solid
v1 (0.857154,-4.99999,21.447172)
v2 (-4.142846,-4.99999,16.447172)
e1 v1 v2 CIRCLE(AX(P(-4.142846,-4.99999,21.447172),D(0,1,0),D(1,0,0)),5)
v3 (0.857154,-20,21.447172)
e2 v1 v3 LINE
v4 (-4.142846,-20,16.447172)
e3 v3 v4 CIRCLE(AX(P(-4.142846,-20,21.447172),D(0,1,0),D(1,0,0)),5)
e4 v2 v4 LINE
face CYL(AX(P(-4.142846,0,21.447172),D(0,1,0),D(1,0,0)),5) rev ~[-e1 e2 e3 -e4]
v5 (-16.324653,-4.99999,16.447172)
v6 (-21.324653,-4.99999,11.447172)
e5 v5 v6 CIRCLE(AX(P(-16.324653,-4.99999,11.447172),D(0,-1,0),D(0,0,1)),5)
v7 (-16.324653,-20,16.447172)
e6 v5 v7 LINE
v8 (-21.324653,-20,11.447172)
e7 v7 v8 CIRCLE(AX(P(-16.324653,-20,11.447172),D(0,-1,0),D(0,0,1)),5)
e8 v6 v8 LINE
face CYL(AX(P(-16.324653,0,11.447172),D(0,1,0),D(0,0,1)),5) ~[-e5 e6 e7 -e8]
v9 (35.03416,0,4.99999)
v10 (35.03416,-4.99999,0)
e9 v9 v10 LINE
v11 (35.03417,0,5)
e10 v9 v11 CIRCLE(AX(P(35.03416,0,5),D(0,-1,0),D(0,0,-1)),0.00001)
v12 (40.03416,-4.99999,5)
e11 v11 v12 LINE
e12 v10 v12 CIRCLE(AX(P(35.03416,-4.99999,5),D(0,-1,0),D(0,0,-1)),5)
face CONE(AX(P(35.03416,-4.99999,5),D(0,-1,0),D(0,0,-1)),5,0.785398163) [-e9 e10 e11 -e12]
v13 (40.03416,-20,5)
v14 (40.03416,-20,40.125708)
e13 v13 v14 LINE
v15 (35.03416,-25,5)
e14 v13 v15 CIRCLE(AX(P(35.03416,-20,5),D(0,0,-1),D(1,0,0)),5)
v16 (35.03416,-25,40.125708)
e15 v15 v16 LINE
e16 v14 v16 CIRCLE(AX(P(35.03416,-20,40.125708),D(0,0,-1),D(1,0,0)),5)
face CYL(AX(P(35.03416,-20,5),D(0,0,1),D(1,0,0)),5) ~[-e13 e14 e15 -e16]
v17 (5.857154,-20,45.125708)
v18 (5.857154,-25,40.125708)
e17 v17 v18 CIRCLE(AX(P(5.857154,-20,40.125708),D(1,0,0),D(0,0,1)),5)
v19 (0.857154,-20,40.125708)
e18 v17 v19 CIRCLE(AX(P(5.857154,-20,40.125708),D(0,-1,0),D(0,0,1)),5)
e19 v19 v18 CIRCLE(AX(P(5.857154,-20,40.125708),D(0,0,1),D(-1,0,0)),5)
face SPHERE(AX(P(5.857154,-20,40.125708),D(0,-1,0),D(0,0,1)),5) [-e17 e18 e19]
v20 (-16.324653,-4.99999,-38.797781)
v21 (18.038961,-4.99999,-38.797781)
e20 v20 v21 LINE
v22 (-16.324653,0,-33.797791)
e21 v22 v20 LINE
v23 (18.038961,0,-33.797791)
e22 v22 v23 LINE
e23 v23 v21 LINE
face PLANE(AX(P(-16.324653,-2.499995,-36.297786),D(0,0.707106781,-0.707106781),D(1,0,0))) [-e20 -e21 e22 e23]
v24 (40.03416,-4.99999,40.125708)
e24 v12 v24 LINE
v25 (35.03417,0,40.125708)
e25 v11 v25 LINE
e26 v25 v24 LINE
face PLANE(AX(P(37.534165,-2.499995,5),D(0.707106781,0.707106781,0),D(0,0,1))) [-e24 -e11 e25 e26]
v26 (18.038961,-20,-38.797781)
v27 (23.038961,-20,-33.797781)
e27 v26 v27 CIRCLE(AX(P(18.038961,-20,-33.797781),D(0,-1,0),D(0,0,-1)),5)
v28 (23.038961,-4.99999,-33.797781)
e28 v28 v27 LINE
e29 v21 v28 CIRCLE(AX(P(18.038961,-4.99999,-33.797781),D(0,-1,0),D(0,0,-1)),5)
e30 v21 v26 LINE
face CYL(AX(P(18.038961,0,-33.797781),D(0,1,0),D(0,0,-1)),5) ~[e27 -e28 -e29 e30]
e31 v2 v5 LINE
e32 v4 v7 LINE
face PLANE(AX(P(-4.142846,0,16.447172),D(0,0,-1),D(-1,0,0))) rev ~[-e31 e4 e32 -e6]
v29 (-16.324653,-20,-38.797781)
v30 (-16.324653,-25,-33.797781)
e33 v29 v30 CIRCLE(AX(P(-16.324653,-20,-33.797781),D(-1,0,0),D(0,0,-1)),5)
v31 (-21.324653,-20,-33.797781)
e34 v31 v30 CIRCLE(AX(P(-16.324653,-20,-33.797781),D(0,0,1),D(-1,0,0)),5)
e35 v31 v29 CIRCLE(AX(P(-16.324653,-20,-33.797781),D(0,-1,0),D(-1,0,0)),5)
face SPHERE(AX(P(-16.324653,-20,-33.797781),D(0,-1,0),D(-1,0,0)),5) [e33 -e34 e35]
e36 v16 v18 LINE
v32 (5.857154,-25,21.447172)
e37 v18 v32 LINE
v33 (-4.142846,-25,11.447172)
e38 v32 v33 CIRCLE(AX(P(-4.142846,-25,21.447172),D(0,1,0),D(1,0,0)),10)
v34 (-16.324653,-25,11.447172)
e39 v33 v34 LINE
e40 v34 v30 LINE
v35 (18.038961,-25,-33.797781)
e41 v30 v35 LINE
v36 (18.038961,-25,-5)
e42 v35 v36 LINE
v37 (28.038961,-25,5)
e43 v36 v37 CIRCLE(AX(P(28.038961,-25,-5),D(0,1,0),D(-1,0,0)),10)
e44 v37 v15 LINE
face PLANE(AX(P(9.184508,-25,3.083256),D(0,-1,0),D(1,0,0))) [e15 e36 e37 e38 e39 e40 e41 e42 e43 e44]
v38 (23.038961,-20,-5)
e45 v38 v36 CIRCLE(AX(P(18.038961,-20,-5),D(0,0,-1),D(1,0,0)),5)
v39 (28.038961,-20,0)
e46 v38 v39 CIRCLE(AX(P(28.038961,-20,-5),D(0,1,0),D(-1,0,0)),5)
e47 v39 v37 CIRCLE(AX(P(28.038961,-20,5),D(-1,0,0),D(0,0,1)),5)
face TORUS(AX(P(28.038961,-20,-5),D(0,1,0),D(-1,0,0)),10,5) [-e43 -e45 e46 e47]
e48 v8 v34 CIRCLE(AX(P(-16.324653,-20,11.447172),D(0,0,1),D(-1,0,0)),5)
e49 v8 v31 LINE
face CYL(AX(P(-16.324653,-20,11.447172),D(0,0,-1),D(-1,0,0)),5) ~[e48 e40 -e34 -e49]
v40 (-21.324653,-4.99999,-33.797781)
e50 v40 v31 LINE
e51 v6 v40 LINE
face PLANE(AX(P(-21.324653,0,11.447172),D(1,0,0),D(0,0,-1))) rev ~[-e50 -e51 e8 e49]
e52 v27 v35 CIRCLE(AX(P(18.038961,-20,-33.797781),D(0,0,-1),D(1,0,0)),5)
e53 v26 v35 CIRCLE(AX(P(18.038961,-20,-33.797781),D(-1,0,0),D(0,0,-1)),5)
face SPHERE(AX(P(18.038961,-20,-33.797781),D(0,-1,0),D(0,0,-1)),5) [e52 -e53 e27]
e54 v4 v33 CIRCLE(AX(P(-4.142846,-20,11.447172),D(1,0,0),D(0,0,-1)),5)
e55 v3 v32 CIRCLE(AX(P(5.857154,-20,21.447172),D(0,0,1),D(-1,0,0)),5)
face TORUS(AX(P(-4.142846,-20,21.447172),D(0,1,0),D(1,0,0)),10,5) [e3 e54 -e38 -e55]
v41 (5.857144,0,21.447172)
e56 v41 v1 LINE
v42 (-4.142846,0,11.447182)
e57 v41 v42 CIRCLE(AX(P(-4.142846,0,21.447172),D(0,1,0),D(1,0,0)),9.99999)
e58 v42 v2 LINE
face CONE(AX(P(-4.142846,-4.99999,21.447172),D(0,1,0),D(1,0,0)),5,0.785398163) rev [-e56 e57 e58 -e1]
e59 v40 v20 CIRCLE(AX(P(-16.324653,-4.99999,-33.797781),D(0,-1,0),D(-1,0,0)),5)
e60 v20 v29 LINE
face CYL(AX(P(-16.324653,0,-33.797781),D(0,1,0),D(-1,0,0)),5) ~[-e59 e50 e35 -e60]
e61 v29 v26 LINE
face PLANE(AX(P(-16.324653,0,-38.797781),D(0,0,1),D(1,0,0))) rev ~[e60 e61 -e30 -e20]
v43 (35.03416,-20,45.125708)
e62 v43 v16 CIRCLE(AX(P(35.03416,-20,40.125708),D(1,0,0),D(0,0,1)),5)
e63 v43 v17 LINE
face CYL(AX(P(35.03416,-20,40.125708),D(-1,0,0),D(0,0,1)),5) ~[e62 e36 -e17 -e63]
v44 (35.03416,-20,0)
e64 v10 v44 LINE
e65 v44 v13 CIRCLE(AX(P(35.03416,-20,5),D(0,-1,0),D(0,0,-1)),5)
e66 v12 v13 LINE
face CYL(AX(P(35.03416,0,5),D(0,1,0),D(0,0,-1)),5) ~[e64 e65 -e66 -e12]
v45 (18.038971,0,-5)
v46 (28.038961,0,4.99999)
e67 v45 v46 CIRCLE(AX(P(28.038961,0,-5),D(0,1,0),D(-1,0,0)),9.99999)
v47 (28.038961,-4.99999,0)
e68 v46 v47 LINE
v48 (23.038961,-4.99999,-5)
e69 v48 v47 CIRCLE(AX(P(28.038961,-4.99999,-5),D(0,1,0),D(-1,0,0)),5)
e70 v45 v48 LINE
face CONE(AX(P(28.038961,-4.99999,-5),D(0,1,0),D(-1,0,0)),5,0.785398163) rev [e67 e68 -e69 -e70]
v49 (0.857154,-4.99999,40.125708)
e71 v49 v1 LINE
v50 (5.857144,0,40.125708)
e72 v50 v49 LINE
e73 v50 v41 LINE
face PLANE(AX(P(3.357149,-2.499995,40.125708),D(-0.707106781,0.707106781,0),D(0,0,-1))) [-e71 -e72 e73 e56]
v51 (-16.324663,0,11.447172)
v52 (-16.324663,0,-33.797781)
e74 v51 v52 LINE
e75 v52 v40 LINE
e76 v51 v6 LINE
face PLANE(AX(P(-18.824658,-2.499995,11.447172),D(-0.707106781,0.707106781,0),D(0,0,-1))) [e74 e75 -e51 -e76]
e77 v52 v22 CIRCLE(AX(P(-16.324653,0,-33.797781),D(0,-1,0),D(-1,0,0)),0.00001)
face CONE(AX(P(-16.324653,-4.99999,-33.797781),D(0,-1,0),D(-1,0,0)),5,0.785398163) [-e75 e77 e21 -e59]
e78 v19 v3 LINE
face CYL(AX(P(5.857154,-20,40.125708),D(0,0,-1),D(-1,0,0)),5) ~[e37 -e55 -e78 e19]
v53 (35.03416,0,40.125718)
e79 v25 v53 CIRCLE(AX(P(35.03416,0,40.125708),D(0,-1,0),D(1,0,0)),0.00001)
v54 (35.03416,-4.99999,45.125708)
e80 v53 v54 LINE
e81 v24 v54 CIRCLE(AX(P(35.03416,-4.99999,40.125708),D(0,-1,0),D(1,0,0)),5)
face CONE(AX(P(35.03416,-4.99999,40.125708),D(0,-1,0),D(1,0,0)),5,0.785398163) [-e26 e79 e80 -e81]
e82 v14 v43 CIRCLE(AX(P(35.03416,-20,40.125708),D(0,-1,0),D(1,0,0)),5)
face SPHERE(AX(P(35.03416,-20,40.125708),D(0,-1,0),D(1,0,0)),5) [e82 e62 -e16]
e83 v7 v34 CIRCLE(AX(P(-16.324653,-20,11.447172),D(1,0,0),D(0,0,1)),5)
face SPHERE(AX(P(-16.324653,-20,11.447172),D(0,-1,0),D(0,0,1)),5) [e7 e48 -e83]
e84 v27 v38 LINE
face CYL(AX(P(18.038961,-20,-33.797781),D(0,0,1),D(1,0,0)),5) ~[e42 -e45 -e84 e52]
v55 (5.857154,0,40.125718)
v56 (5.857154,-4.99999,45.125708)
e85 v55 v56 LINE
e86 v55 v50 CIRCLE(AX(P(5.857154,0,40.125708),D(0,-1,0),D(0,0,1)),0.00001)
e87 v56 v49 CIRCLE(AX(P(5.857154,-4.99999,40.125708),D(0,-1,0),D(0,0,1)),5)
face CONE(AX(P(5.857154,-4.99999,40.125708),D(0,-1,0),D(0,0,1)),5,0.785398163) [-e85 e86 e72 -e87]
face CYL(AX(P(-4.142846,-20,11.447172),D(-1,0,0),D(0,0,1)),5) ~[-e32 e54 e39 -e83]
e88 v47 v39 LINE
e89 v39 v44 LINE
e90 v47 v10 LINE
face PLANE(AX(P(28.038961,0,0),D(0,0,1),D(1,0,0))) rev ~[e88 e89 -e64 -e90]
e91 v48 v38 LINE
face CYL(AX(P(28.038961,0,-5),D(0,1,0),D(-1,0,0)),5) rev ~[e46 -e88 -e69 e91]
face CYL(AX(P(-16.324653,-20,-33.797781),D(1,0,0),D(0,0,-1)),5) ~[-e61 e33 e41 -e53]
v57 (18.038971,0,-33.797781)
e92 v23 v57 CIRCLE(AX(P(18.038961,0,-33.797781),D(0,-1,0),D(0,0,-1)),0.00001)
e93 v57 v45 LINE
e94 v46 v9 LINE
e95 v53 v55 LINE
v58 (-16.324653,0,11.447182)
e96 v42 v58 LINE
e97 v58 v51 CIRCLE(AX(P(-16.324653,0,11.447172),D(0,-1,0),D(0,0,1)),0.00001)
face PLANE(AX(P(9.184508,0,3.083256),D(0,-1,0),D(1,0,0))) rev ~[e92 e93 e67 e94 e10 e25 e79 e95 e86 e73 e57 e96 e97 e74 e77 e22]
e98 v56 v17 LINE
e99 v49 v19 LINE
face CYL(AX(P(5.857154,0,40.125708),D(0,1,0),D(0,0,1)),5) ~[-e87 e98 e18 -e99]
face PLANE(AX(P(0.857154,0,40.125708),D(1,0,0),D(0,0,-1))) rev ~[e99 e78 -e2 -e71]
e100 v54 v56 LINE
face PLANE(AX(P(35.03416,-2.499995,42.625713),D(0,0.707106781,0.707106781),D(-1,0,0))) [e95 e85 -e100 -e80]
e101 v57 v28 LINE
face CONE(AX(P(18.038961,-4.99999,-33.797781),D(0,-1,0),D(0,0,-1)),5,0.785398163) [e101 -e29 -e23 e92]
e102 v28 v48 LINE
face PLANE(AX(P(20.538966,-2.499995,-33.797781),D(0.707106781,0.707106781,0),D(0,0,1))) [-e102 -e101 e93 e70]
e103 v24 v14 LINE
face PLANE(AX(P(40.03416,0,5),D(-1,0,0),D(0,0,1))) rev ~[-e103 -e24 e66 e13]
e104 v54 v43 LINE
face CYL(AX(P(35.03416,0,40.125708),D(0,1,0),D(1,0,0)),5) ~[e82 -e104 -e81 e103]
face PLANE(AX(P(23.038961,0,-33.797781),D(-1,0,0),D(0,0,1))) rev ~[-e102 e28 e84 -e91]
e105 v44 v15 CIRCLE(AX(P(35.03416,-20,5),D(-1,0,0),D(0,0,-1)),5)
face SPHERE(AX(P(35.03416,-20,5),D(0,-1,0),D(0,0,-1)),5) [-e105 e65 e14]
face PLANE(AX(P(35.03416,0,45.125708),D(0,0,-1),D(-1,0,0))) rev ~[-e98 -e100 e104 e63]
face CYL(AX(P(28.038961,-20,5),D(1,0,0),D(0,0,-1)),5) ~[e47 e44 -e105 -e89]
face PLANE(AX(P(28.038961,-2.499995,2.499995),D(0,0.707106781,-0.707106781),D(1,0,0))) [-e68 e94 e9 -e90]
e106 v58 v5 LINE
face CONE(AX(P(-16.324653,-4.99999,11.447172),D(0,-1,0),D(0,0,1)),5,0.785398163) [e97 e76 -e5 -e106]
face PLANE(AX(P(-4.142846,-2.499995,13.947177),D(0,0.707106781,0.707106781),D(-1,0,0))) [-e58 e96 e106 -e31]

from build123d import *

# Parameters (mm, degrees)
F1_DEPTH = 25
F2_R     = 5
F3_SIZE  = 4.99999


# Not quite as in the source:
# - a fillet or chamfer is up to 0.001 mm smaller than in the source, because OpenCascade refuses the exact size


with BuildPart() as f1:
    # F0 (on Front) → F1 (new body)
    with BuildSketch(Plane.XZ):
        with BuildLine():
            Line((-4.1428460926, 16.4471715689), (-16.3246531785, 16.4471715689))
            ThreePointArc((-16.3246531785, 16.4471715689), (-19.8601870844, 14.9827054748), (-21.3246531785, 11.4471715689))
            Line((-21.3246531785, 11.4471715689), (-21.3246531785, -33.7977808714))
            ThreePointArc((-21.3246531785, -33.7977808714), (-19.8601870844, -37.3333147773), (-16.3246531785, -38.7977808714))
            Line((-16.3246531785, -38.7977808714), (18.0389609933, -38.7977808714))
            ThreePointArc((18.0389609933, -38.7977808714), (21.5744948992, -37.3333147773), (23.0389609933, -33.7977808714))
            Line((23.0389609933, -33.7977808714), (23.0389609933, -5))
            ThreePointArc((23.0389609933, -5), (24.5034270874, -1.4644660941), (28.0389609933, 0))
            Line((28.0389609933, 0), (35.034160018, 0))
            ThreePointArc((35.034160018, 0), (38.5696939239, 1.4644660941), (40.034160018, 5))
            Line((40.034160018, 5), (40.034160018, 40.125707984))
            ThreePointArc((40.034160018, 40.125707984), (38.5696939239, 43.6612418899), (35.034160018, 45.125707984))
            Line((35.034160018, 45.125707984), (5.8571539074, 45.125707984))
            ThreePointArc((5.8571539074, 45.125707984), (2.3216200015, 43.6612418899), (0.8571539074, 40.125707984))
            Line((0.8571539074, 40.125707984), (0.8571539074, 21.4471715689))
            ThreePointArc((0.8571539074, 21.4471715689), (-0.6073121866, 17.9116376629), (-4.1428460926, 16.4471715689))
        make_face()
    extrude(amount=F1_DEPTH)

    # F2
    f2_edges = [f1.edges().sort_by_distance(p)[0] for p in [
        (0.857154, -25, -38.797781),
    ]]
    fillet(f2_edges, radius=F2_R)

    # F3 (size 5 in the source; OpenCascade refuses exactly that, so slightly less here)
    f3_edges = [f1.edges().sort_by_distance(p)[0] for p in [
        (20.445657, 0, 45.125708),
        (2.32162, 0, 43.661242),
        (0.857154, 0, 30.78644),
        (-0.607312, 0, 17.911638),
        (-10.23375, 0, 16.447172),
        (-19.860187, 0, 14.982705),
        (-21.324653, 0, -11.175305),
        (-19.860187, 0, -37.333315),
        (0.857154, 0, -38.797781),
        (21.574495, 0, -37.333315),
        (23.038961, 0, -19.39889),
        (24.503427, 0, -1.464466),
        (31.536561, 0, 0),
        (38.569694, 0, 1.464466),
        (40.03416, 0, 22.562854),
        (38.569694, 0, 43.661242),
    ]]
    chamfer(f3_edges, length=F3_SIZE)


solid = f1.part
